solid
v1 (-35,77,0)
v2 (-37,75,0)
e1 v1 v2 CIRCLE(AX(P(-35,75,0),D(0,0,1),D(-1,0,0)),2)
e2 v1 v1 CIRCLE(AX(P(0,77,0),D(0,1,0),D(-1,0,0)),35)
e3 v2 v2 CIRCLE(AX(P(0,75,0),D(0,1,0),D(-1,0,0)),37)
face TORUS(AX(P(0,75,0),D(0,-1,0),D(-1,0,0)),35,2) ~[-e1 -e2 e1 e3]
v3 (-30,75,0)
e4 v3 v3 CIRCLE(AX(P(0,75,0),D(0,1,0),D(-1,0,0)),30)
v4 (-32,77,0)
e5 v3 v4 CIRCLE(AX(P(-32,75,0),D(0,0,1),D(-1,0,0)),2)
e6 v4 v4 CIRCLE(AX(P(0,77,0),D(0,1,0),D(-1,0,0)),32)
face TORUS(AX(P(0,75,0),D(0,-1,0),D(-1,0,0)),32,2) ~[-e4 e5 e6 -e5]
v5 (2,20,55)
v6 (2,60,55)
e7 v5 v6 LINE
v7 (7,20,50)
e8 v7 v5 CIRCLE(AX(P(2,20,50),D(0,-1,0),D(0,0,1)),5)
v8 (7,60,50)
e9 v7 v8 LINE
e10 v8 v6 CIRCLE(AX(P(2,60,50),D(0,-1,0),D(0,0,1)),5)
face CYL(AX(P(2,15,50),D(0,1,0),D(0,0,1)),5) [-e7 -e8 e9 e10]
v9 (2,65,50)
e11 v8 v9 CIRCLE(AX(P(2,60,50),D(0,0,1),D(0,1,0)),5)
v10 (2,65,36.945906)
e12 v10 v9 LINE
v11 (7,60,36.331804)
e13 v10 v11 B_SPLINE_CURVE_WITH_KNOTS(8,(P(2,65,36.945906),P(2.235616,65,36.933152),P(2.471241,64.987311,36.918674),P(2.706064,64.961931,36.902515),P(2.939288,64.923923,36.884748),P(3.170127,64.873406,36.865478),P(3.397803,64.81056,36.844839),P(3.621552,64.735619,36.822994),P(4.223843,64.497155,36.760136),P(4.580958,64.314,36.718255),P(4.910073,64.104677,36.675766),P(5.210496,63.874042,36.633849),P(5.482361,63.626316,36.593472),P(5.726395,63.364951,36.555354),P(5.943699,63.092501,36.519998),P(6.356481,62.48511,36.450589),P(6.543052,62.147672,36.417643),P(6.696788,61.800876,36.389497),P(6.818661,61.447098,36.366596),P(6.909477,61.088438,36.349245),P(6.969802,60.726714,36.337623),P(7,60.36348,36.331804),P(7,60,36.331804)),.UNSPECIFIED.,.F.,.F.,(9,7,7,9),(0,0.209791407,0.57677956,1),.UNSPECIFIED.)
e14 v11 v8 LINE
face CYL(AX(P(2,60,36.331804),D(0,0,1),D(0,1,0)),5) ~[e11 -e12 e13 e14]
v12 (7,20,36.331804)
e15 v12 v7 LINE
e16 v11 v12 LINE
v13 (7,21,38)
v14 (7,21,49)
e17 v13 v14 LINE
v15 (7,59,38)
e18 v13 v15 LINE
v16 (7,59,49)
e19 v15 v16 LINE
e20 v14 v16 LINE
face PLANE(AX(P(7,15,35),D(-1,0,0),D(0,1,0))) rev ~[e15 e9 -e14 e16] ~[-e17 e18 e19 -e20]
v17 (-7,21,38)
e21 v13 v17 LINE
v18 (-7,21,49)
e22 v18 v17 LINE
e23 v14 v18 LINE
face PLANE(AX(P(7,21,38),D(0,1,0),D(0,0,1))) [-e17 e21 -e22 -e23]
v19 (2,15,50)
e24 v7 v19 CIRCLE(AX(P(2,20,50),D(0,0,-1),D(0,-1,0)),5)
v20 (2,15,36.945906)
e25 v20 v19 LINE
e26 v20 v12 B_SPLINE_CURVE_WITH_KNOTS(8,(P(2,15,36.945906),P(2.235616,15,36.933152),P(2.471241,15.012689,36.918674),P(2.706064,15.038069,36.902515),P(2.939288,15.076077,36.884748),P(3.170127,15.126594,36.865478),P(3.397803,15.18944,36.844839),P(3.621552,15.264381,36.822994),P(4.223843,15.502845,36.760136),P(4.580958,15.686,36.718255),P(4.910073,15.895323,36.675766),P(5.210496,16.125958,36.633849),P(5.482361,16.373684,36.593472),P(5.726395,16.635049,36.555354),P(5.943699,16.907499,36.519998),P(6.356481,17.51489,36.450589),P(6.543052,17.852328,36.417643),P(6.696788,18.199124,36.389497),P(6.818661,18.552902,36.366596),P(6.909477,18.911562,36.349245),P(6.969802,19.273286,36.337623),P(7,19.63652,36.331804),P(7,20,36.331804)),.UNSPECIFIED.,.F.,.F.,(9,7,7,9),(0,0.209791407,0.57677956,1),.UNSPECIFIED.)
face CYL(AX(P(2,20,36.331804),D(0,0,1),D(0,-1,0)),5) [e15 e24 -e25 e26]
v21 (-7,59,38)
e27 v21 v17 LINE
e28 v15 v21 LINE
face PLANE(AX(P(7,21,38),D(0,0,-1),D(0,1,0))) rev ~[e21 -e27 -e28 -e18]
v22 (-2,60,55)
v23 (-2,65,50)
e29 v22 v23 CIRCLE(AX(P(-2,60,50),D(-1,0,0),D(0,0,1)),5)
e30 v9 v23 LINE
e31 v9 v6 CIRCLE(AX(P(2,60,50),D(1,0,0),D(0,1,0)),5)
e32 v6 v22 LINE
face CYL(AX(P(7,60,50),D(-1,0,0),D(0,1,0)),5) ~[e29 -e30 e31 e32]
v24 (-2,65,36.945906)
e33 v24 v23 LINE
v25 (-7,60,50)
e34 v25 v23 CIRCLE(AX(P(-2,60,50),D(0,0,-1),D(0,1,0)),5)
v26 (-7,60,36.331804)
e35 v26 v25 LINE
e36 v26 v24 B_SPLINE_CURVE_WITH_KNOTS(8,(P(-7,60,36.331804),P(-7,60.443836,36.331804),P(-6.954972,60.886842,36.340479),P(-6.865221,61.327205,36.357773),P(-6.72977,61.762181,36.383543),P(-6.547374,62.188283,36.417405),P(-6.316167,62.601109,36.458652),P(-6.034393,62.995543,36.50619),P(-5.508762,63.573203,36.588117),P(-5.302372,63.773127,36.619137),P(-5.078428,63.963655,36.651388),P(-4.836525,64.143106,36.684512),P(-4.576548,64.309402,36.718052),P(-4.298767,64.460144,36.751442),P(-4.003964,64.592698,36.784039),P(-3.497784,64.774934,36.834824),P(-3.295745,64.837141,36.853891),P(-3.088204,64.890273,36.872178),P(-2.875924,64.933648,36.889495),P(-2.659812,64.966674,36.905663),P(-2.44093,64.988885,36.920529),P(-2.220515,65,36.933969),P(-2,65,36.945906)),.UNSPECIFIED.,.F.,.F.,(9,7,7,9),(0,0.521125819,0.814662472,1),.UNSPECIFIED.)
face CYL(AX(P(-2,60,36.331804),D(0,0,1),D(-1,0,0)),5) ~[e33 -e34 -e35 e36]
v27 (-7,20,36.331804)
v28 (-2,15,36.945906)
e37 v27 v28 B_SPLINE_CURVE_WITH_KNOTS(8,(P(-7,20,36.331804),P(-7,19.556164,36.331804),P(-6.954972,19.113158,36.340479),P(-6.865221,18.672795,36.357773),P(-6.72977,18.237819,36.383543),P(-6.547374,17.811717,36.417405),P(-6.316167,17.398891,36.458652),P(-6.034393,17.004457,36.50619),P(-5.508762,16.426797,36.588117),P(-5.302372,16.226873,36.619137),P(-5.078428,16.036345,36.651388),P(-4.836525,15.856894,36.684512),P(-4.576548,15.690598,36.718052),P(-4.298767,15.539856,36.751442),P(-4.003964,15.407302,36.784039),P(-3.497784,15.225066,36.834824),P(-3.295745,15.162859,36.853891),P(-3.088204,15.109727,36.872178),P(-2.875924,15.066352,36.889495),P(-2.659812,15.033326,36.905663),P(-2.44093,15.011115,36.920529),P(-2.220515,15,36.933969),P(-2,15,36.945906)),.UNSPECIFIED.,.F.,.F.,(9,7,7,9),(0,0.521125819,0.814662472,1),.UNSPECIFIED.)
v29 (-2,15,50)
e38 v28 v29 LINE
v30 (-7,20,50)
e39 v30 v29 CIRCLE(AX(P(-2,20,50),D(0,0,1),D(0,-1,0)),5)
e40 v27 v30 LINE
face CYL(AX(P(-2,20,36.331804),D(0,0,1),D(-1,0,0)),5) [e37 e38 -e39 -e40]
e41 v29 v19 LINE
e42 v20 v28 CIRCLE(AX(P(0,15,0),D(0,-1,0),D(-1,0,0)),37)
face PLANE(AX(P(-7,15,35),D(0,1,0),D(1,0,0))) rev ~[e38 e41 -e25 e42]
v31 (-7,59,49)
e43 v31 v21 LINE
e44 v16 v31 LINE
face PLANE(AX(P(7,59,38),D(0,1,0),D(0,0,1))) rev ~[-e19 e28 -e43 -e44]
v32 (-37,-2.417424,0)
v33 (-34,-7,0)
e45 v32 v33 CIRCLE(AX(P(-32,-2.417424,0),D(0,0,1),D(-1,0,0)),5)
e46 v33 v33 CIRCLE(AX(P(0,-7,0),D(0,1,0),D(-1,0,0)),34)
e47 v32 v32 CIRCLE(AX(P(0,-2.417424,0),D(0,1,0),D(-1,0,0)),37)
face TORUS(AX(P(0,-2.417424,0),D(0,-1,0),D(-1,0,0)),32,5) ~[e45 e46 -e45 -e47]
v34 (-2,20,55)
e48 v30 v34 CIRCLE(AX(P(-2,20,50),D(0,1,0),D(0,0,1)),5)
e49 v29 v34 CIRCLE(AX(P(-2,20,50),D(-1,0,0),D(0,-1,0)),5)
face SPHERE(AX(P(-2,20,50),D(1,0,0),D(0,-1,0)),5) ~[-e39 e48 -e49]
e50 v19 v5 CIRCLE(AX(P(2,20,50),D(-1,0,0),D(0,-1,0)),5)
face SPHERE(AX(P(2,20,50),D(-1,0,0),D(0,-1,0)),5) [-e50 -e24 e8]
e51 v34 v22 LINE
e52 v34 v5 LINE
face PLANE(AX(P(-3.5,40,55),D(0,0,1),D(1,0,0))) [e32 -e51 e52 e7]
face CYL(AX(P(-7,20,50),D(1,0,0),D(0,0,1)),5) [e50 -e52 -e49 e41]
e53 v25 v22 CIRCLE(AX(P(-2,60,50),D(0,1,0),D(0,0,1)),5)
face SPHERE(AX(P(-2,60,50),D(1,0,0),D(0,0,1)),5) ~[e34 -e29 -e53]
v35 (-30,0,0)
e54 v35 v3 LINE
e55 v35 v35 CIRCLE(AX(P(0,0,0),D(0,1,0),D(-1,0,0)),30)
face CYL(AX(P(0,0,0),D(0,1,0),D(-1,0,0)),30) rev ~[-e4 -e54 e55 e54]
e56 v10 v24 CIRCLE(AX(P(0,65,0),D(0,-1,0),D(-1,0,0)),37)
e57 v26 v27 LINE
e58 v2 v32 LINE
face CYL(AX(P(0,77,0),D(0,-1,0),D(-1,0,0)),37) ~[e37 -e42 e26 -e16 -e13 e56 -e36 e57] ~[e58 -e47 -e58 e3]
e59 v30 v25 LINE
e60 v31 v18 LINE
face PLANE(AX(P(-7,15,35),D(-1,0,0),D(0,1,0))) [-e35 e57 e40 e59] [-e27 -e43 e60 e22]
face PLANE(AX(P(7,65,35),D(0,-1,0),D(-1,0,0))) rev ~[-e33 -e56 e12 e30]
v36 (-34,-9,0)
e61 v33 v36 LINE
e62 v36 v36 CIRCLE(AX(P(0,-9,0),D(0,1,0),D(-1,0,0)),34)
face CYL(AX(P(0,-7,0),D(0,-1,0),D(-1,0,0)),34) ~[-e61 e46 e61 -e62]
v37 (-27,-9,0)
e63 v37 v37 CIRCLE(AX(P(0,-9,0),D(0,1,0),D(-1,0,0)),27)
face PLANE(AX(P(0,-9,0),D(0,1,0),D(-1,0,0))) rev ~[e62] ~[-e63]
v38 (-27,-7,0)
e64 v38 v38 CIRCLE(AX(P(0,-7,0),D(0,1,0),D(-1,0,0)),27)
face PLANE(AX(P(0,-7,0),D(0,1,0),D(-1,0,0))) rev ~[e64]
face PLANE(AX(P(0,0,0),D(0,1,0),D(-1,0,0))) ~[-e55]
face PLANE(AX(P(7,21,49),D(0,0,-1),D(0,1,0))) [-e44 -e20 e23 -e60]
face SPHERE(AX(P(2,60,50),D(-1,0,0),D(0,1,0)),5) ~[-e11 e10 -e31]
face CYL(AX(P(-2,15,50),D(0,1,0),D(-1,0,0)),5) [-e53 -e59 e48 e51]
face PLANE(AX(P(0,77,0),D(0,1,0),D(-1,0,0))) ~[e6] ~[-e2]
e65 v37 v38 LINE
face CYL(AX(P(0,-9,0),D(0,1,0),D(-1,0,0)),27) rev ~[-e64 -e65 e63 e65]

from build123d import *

# Parameters (mm, degrees)
F2_R     = 2
F5_W     = 7
F5_H     = 50
F6_DEPTH = 20
F8_R     = 5
F7_W     = 38
F7_H     = 11
F9_DEPTH = 25


# Not quite as in the source:
# - a fillet or chamfer that OpenCascade refuses, or shapes differently, is made with other operations: its cross-section is extruded or revolved along the edge and cut away or added
# - two fillets or chamfers of one size are made in one step


with BuildPart() as f1:
    # F0 (on Top) → F1 (revolve)
    with BuildSketch(Plane.XY):
        Polygon((0, -7), (0, 0), (-30, 0), (-30, 77), (-37, 77), (-37, -7), (-34, -7), (-34, -9), (-27, -9), (-27, -7), align=None)
    revolve(axis=Axis((0, 38.5, 0), (0, 1, 0)))

    # F2
    f2_edges = [f1.edges().sort_by_distance(p)[0] for p in [
        (37, 77, 0),
        (30, 77, 0),
    ]]
    fillet(f2_edges, radius=F2_R)

    # F3: fillet of radius 5 on 1 edges, made by hand

    # F3_s1 → F3_t2 (revolve, cut)
    with BuildSketch(Plane.XY):
        with BuildLine():
            ThreePointArc((-37, -2.417424305), (-36.1833001327, -5.1560370926), (-34, -7))
            Line((-34, -7), (-37, -7))
            Line((-37, -7), (-37, -2.417424305))
        make_face()
    revolve(axis=Axis((0, -7, 0), (0, 1, 0)), mode=Mode.SUBTRACT)

    # F5 (on offset) → F6 (join)
    with BuildSketch(Plane.XY.offset(35)):
        with Locations((-3.5, 40)):
            Rectangle(F5_W, F5_H)
        with Locations((3.5, 40)):
            Rectangle(F5_W, F5_H)
    extrude(amount=F6_DEPTH)

    # F8
    f8_edges = [f1.edges().sort_by_distance(p)[0] for p in [
        (0, 65, 55),
        (0, 15, 55),
        (7, 15, 45.665902),
        (-7, 15, 45.665902),
        (-7, 40, 55),
        (-7, 65, 45.665902),
        (7, 65, 45.665902),
        (7, 40, 55),
    ]]
    fillet(f8_edges, radius=F8_R)

    # F7 (on face) → F9 (cut)
    with BuildSketch(Plane.YZ.offset(7)):
        with Locations((40, 43.5)):
            Rectangle(F7_W, F7_H)
    extrude(amount=-F9_DEPTH, mode=Mode.SUBTRACT)


solid = f1.part
